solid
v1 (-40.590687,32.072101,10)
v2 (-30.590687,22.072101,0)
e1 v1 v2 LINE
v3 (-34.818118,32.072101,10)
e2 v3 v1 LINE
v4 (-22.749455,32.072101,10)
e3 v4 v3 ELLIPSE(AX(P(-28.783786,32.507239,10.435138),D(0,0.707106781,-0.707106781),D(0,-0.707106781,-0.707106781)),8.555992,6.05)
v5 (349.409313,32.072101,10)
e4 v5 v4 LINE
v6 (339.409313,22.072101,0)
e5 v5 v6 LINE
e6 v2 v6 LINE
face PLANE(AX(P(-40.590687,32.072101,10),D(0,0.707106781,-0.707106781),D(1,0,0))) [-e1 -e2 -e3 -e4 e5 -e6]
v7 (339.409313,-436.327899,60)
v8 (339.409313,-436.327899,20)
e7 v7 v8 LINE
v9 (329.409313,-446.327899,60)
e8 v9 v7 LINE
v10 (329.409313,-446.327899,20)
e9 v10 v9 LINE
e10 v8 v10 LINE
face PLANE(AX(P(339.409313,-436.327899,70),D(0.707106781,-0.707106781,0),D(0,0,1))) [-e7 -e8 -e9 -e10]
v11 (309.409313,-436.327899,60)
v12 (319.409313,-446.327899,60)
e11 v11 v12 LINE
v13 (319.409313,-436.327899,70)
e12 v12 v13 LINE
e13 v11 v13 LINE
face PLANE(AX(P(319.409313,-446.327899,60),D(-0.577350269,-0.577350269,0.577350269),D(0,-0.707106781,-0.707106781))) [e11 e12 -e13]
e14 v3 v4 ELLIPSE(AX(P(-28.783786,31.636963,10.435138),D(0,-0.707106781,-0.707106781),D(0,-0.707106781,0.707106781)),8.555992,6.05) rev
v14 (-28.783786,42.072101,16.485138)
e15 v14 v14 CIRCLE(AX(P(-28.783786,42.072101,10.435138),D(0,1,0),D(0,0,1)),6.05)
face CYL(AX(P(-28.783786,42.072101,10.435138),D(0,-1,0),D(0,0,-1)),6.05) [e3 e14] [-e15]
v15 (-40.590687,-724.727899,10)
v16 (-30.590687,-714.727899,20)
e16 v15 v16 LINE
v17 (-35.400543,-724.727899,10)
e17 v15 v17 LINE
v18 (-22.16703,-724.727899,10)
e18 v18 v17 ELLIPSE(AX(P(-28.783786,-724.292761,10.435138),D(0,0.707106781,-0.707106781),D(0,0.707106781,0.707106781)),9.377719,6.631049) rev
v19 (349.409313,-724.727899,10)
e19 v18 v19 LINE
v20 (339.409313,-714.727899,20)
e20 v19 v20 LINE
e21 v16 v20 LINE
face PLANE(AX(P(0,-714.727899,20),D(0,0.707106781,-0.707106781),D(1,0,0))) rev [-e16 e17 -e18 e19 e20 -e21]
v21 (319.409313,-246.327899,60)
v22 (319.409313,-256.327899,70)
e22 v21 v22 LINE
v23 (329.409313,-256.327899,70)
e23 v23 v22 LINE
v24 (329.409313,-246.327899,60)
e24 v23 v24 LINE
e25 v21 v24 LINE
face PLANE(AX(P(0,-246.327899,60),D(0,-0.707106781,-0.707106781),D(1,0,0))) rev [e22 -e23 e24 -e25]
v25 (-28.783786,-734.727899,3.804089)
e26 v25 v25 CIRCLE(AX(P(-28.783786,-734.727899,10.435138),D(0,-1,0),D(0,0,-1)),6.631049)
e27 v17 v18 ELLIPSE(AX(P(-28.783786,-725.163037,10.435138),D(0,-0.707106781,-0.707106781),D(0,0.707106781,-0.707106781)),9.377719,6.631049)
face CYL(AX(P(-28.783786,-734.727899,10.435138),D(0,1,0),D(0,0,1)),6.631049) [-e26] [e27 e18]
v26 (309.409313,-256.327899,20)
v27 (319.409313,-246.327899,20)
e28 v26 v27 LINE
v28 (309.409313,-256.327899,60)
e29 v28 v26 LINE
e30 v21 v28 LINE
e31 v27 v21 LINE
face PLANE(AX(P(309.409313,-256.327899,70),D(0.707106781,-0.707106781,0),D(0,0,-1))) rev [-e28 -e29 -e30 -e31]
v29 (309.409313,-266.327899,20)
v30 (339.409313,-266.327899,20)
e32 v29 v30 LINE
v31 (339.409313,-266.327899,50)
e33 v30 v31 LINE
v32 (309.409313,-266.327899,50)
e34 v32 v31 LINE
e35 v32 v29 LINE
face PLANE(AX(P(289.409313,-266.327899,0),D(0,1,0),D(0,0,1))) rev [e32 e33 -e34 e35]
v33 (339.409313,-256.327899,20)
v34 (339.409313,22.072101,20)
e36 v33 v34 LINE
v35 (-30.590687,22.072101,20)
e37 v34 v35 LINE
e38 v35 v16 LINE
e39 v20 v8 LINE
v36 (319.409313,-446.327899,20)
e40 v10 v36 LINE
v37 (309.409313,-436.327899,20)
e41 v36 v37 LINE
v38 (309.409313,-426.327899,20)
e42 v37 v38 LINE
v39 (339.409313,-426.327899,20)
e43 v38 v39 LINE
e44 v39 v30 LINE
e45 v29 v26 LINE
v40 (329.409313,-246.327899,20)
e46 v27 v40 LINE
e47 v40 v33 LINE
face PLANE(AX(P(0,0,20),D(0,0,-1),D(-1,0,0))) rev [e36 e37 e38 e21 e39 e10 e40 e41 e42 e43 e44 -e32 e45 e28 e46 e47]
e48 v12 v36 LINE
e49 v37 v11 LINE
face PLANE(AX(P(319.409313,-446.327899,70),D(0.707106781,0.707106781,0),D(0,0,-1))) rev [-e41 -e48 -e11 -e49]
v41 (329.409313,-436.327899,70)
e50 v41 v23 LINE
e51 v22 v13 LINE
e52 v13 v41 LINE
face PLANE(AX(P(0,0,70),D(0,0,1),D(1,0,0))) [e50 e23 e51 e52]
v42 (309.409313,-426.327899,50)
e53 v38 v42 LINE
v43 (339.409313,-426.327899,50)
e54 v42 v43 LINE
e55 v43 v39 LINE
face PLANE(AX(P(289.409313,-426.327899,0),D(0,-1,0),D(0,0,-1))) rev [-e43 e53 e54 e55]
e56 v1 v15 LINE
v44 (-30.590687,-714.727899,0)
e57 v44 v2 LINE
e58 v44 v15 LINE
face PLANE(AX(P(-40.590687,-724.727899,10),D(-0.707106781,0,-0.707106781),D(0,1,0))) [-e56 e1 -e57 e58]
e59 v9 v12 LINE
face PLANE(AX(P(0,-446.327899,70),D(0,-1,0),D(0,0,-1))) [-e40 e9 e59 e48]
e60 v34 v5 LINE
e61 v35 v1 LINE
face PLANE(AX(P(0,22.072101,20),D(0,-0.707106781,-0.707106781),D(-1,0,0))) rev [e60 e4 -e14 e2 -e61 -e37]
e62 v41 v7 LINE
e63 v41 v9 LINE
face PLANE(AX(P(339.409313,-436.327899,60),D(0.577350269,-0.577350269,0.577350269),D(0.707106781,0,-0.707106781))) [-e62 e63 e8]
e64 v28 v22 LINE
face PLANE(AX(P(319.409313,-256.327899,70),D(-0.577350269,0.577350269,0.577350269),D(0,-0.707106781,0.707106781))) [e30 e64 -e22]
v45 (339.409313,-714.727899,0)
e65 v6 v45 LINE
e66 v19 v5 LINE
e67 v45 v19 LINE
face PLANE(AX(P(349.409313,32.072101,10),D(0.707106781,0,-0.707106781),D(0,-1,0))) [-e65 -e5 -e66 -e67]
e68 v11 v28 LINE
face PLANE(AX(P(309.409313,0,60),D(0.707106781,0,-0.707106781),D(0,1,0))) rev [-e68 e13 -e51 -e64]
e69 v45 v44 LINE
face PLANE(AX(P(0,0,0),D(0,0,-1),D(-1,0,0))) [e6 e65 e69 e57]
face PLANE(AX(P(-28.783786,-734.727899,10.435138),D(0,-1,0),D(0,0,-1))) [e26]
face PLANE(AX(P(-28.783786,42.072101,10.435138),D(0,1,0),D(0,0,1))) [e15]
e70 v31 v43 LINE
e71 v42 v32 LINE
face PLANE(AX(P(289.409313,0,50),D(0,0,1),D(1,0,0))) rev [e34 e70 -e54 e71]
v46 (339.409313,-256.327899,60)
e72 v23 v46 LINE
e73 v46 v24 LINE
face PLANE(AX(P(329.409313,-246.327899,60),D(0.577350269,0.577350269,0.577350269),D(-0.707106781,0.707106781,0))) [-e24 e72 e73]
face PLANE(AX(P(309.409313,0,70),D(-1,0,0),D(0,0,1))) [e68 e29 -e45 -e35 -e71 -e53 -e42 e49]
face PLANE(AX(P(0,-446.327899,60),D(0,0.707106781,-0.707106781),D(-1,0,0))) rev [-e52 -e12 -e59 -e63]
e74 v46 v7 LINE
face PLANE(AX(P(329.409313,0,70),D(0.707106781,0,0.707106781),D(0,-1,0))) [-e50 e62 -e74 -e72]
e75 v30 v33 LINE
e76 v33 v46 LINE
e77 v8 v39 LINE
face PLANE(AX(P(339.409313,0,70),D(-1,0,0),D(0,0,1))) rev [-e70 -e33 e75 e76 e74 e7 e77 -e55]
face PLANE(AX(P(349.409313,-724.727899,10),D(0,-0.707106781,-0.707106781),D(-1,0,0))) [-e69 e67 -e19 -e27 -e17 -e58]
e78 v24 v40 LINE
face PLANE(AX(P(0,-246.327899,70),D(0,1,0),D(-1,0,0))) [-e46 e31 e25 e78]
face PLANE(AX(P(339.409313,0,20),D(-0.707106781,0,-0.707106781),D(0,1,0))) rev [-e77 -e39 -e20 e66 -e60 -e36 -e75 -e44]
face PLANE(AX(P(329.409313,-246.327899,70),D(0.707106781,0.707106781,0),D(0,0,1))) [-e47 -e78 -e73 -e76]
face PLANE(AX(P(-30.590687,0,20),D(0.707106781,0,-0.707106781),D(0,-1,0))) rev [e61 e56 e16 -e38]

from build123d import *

# Parameters (mm, degrees)
SKETCH1_W           = 390
SKETCH1_H           = 756.8
BOSS_EXTRUDE1_DEPTH = 20
SKETCH2_R           = 6.05
BOSS_EXTRUDE2_DEPTH = 10
SKETCH3_R           = 6.631048811
BOSS_EXTRUDE3_DEPTH = 10
CHAMFER1_SIZE       = 10
BOSS_EXTRUDE5_DEPTH = 50
SKETCH5_W           = 30
SKETCH5_H           = 160
CUT_EXTRUDE1_DEPTH  = 50
CHAMFER2_SIZE       = 10


with BuildPart() as part:
    # Sketch1 → Boss-Extrude1 (new body)
    with BuildSketch(Plane.XY):
        with Locations((154.409313495, -346.327898551)):
            Rectangle(SKETCH1_W, SKETCH1_H)
    extrude(amount=BOSS_EXTRUDE1_DEPTH)

    # Sketch2 → Boss-Extrude2 (add)
    with BuildSketch(Plane(origin=(0, 32.072101449, 0), x_dir=(1, 0, 0), z_dir=(0, 1, 0))):
        with Locations(Location((-28.78378628, -10.435138004, 0), (0, 0, 90))):
            Circle(SKETCH2_R)
    extrude(amount=BOSS_EXTRUDE2_DEPTH)

    # Sketch3 → Boss-Extrude3 (add)
    with BuildSketch(Plane.XZ.offset(724.727898551)):
        with Locations(Location((-28.78378628, 10.435138004, 0), (0, 0, 90))):
            Circle(SKETCH3_R)
    extrude(amount=BOSS_EXTRUDE3_DEPTH)

    # Chamfer1
    # the kernel refuses this chamfer: 10 mm, written as the material it takes off along each edge
    with BuildSketch(Plane(origin=(-40.590686505, -750.44472843, 20), x_dir=(-0.027495876610586317, 0, -0.9996219169112968), z_dir=(0, 1, 0)), Plane(origin=(349.409313495, 57.788931329, 0), x_dir=(-0.9996219169112968, 0, -0.027495876610586334), z_dir=(0, -1, 0))) as chamfer1_piece_1:
        Polygon((CHAMFER1_SIZE * 0.999621916911, -CHAMFER1_SIZE * 0.0274958766106), (-CHAMFER1_SIZE * 0.0274958766106, -CHAMFER1_SIZE * 0.999621916911), (0, 0), align=None)
    extrude(amount=808.233659759, mode=Mode.SUBTRACT)
    with BuildSketch(Plane(origin=(375.126143374, -724.727898551, 20), x_dir=(0, 0.9996219169112968, 0.02749587661058643), z_dir=(-1, 0, 0))) as chamfer1_piece_2_section:
        Polygon((CHAMFER1_SIZE * 0.999621916911, CHAMFER1_SIZE * 0.0274958766106), (-CHAMFER1_SIZE * 0.0274958766106, CHAMFER1_SIZE * 0.999621916911), (0, 0), align=None)
    chamfer1_piece_2 = extrude(amount=441.433659759, mode=Mode.PRIVATE)
    chamfer1_piece_2 = chamfer1_piece_2 - Plane(origin=(-28.78378628, -721.415314621, 10.435138004), x_dir=(0, 0, 1), z_dir=(0, 1, 0)) * Cylinder(6.631048811, 923, mode=Mode.PRIVATE)
    add(chamfer1_piece_2, mode=Mode.SUBTRACT)
    with BuildSketch(Plane(origin=(349.409313495, 57.788931329, 20), x_dir=(-0.9996219169112968, 0, 0.027495876610586282), z_dir=(0, -1, 0)), Plane(origin=(-40.590686505, -750.44472843, 0), x_dir=(-0.027495876610586317, 0, 0.9996219169112968), z_dir=(0, 1, 0))) as chamfer1_piece_3:
        Polygon((CHAMFER1_SIZE * 0.999621916911, CHAMFER1_SIZE * 0.0274958766106), (-CHAMFER1_SIZE * 0.0274958766106, CHAMFER1_SIZE * 0.999621916911), (0, 0), align=None)
    extrude(amount=808.233659759, mode=Mode.SUBTRACT)
    with BuildSketch(Plane(origin=(-66.307516385, 32.072101449, 20), x_dir=(0, 0.027495876610586317, -0.9996219169112968), z_dir=(1, 0, 0))) as chamfer1_piece_4_section:
        Polygon((CHAMFER1_SIZE * 0.999621916911, -CHAMFER1_SIZE * 0.0274958766106), (-CHAMFER1_SIZE * 0.0274958766106, -CHAMFER1_SIZE * 0.999621916911), (0, 0), align=None)
    chamfer1_piece_4 = extrude(amount=441.433659759, mode=Mode.PRIVATE)
    chamfer1_piece_4 = chamfer1_piece_4 - Plane(origin=(-28.78378628, 28.76135635, 10.435138004), x_dir=(0, 0, -1), z_dir=(0, -1, 0)) * Cylinder(6.05, 923, mode=Mode.PRIVATE)
    add(chamfer1_piece_4, mode=Mode.SUBTRACT)
    with BuildSketch(Plane(origin=(375.126143374, -724.727898551, 0), x_dir=(0, 0.9996219169112968, -0.027495876610586487), z_dir=(-1, 0, 0))) as chamfer1_piece_5_section:
        Polygon((CHAMFER1_SIZE * 0.999621916911, -CHAMFER1_SIZE * 0.0274958766106), (-CHAMFER1_SIZE * 0.0274958766106, -CHAMFER1_SIZE * 0.999621916911), (0, 0), align=None)
    chamfer1_piece_5 = extrude(amount=441.433659759, mode=Mode.PRIVATE)
    chamfer1_piece_5 = chamfer1_piece_5 - Plane(origin=(-28.78378628, -721.416873801, 10.435138004), x_dir=(0, 0, 1), z_dir=(0, 1, 0)) * Cylinder(6.631048811, 923, mode=Mode.PRIVATE)
    add(chamfer1_piece_5, mode=Mode.SUBTRACT)
    with BuildSketch(Plane(origin=(-66.307516385, 32.072101449, 0), x_dir=(0, 0.027495876610586317, 0.9996219169112968), z_dir=(1, 0, 0))) as chamfer1_piece_6_section:
        Polygon((CHAMFER1_SIZE * 0.999621916911, CHAMFER1_SIZE * 0.0274958766106), (-CHAMFER1_SIZE * 0.0274958766106, CHAMFER1_SIZE * 0.999621916911), (0, 0), align=None)
    chamfer1_piece_6 = extrude(amount=441.433659759, mode=Mode.PRIVATE)
    chamfer1_piece_6 = chamfer1_piece_6 - Plane(origin=(-28.78378628, 28.763199232, 10.435138004), x_dir=(0, 0, -1), z_dir=(0, -1, 0)) * Cylinder(6.05, 923, mode=Mode.PRIVATE)
    add(chamfer1_piece_6, mode=Mode.SUBTRACT)

    # Sketch4 → Boss-Extrude5 (add)
    with BuildSketch(Plane.XY.offset(20)):
        Polygon((309.409313495, -346.327898551), (309.409313495, -246.327898551), (339.409313495, -246.327898551), (339.409313495, -446.327898551), (309.409313495, -446.327898551), align=None)
    extrude(amount=BOSS_EXTRUDE5_DEPTH)

    # Sketch5 → Cut-Extrude1 (cut)
    with BuildSketch(Plane(origin=(339.409313495, 0, 0), x_dir=(0, 0, -1), z_dir=(1, 0, 0))):
        with Locations((-35, -346.327898551)):
            Rectangle(SKETCH5_W, SKETCH5_H)
    extrude(amount=-CUT_EXTRUDE1_DEPTH, mode=Mode.SUBTRACT)

    # Chamfer2
    chamfer2_edges = [part.edges().sort_by_distance(p)[0] for p in [
        (309.409313495, -346.327898551, 70),
        (309.409313495, -246.327898551, 45),
        (324.409313495, -446.327898551, 70),
        (309.409313495, -446.327898551, 45),
        (339.409313495, -446.327898551, 45),
        (324.409313495, -246.327898551, 70),
        (339.409313495, -246.327898551, 45),
        (339.409313495, -346.327898551, 70),
    ]]
    chamfer(chamfer2_edges, length=CHAMFER2_SIZE)


solid = part.part
